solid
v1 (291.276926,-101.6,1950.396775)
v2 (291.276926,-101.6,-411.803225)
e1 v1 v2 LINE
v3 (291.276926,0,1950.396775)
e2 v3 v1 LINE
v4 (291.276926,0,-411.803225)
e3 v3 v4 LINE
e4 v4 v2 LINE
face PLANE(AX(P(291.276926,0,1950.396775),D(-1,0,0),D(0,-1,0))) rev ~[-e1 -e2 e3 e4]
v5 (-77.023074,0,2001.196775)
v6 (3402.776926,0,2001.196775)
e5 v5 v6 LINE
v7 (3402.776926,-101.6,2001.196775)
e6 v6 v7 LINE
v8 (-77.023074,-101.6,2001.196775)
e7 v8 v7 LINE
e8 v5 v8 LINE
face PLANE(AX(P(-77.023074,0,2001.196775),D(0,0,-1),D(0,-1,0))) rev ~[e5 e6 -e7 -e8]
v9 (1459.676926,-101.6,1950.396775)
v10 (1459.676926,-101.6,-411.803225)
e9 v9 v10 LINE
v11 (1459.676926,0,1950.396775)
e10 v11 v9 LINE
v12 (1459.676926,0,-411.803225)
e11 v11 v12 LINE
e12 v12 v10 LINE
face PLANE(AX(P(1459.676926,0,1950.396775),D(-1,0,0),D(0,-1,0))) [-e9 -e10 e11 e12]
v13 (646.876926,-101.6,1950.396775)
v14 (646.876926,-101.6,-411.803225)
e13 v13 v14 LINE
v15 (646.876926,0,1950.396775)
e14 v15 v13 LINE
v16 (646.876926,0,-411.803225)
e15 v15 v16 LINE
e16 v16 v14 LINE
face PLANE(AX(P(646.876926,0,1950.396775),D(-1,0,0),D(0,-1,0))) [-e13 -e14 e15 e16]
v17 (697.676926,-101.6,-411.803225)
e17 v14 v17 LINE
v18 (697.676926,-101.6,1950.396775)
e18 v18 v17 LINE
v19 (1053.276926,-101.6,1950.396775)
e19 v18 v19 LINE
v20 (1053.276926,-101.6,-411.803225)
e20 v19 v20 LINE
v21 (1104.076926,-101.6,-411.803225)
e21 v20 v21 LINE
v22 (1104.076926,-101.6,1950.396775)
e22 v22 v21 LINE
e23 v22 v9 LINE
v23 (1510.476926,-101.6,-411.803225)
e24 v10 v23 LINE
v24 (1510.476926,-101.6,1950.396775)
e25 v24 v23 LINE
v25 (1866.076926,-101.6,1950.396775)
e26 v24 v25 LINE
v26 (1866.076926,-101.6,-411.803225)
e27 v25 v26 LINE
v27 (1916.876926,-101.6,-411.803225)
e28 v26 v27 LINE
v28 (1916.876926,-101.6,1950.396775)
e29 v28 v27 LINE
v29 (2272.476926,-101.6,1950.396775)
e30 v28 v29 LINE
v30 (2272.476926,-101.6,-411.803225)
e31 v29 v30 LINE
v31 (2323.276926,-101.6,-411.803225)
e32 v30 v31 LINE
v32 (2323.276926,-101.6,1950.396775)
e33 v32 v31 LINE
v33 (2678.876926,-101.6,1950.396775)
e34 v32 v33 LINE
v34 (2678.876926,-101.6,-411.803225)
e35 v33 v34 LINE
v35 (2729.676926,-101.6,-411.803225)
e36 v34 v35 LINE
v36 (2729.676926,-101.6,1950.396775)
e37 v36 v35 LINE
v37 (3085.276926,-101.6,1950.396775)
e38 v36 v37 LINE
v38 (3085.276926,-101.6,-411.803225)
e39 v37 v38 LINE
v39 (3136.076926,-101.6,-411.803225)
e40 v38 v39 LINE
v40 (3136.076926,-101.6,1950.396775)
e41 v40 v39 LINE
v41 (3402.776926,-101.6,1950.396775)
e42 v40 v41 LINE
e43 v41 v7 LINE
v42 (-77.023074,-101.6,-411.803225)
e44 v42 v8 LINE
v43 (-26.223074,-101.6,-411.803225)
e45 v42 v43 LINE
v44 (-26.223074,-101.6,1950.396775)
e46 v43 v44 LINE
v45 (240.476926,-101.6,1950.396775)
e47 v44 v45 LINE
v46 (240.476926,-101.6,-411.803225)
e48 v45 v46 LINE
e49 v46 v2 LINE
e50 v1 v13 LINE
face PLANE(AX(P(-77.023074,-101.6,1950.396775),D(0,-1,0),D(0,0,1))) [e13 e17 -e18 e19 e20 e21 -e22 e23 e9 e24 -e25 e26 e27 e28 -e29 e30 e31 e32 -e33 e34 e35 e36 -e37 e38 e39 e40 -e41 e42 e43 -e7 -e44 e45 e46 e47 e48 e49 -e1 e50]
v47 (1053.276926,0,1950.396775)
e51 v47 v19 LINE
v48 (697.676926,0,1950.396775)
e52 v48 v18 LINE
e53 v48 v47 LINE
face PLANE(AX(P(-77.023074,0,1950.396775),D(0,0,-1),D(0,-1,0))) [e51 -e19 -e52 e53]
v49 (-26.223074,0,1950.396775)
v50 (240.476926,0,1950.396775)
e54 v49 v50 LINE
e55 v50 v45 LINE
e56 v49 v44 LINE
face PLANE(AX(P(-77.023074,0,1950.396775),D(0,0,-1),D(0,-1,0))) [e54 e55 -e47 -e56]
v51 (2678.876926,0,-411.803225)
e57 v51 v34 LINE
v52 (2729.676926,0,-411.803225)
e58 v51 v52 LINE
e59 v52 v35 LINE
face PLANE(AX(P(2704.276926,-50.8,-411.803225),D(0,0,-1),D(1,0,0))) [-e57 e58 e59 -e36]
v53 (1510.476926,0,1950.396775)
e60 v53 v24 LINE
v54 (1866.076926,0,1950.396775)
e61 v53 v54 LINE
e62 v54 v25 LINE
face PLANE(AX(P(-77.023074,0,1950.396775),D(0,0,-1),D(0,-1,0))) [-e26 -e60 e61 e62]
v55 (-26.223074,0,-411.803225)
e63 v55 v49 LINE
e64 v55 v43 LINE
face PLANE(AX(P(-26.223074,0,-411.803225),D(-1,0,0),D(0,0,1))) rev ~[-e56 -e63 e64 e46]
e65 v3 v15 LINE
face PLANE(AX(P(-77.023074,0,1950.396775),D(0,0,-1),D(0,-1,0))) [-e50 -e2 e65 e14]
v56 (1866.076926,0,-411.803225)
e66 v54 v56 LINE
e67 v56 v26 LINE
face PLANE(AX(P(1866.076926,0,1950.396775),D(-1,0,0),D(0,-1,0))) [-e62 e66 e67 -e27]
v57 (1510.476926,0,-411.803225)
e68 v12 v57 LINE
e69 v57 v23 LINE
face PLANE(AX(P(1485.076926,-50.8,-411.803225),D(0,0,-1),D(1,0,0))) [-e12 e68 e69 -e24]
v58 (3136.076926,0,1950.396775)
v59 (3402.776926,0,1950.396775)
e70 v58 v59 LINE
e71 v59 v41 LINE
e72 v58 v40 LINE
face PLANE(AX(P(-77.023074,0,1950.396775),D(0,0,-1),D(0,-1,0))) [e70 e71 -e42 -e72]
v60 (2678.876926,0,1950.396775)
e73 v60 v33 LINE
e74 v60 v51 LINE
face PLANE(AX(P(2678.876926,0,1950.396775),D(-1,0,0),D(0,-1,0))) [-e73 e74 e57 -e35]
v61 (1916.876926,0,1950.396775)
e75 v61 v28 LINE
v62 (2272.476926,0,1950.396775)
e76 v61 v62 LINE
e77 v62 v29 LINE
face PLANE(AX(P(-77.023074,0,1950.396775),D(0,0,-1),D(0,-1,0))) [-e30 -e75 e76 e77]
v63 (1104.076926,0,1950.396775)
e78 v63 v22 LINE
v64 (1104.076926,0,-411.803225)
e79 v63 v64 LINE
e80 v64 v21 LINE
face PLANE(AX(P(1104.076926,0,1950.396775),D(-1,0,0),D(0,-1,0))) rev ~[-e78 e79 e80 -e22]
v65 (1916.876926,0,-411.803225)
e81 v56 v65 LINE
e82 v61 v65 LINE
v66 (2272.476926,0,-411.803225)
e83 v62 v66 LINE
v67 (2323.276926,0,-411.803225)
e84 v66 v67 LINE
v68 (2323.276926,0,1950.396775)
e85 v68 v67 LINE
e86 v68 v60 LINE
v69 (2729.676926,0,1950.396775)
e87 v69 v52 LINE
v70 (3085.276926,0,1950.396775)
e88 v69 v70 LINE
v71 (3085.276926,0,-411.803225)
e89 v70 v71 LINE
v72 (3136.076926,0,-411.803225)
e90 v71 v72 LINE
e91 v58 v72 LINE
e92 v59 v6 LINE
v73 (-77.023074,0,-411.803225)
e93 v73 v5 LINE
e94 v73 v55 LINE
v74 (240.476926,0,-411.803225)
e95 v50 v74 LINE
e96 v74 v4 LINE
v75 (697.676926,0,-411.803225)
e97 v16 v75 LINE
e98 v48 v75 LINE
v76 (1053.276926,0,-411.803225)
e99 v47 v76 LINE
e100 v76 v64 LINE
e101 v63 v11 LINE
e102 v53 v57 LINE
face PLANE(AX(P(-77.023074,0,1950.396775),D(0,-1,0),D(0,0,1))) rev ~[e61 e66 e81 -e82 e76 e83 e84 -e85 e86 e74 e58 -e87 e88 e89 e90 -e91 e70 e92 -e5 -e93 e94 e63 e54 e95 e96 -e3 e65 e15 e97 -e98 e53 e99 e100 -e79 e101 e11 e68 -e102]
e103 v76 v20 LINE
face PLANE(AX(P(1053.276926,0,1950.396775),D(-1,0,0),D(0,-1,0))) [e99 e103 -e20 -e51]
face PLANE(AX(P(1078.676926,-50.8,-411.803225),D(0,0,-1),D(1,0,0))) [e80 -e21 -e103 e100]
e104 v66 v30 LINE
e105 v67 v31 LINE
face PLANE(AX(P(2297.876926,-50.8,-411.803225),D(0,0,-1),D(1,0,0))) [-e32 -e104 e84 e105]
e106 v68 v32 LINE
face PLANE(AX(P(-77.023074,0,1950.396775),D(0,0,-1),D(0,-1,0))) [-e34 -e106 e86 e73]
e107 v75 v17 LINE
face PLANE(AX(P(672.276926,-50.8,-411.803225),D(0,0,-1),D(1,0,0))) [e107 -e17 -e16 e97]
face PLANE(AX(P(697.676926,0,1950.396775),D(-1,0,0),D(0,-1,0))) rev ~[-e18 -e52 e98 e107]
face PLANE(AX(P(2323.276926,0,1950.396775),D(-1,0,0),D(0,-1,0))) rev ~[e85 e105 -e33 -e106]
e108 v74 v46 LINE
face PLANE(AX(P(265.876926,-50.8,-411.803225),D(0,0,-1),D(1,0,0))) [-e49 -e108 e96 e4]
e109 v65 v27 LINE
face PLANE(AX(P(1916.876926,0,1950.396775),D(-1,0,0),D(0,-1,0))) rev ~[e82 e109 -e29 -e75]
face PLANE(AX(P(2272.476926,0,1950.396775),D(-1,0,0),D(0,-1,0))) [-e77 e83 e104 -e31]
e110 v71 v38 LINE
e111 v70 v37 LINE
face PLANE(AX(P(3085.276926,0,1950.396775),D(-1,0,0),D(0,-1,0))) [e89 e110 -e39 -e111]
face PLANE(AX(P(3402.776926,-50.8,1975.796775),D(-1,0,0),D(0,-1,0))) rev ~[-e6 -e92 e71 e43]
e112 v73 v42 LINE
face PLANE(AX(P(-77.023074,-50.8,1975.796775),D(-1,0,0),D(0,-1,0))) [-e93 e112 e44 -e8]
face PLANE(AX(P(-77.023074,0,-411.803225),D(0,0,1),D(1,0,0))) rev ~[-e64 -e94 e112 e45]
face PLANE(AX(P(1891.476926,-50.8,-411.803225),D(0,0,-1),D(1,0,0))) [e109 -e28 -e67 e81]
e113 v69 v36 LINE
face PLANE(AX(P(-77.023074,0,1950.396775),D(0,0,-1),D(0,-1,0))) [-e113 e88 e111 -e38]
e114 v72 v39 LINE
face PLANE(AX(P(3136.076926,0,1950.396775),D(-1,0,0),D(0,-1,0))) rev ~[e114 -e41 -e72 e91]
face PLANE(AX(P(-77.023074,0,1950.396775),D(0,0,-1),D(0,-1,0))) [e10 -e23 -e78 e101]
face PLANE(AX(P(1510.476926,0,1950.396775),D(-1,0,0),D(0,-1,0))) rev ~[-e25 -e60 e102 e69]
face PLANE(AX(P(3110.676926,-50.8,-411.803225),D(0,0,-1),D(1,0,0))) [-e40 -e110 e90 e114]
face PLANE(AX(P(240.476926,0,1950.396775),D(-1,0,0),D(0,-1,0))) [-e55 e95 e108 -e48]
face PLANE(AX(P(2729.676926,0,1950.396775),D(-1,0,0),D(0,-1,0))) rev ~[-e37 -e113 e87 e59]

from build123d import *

# Parameters (mm, degrees)
F0_W     = 50.8
F0_H     = 2362.2
F1_DEPTH = 101.6
F2_W     = 101.6
F2_H     = 50.8
F3_DEPTH = 3479.8
F4_W     = 50.8
F4_H     = 101.6
F5_DEPTH = 2362.2


# Not quite as in the source:
# - a feature names something its author has since deleted; it is built from what else it names


with BuildPart() as f1:
    # F0 (on Front) → F1 (new body)
    with BuildSketch(Plane.XZ):
        with Locations((-51.6230743378, 769.2967753548)):
            Rectangle(F0_W, F0_H)
    extrude(amount=F1_DEPTH)

    # F2 (on face) → F3 (join)
    with BuildSketch(Plane(origin=(-77.0230743378, 0, 0), x_dir=(0, -1, 0), z_dir=(-1, 0, 0))):
        with Locations((50.8, 1975.7967753548)):
            Rectangle(F2_W, F2_H)
    extrude(amount=-F3_DEPTH)

    # F4 (on face) → F5 (join)
    with BuildSketch(Plane(origin=(0, 0, 1950.3967753548), x_dir=(1, 0, 0), z_dir=(0, 0, -1))):
        with Locations((265.8769256622, 50.8)):
            Rectangle(F4_W, F4_H)
        with Locations((672.2769256622, 50.8)):
            Rectangle(F4_W, F4_H)
        with Locations((1078.6769256622, 50.8)):
            Rectangle(F4_W, F4_H)
        with Locations((1485.0769256622, 50.8)):
            Rectangle(F4_W, F4_H)
        with Locations((1891.4769256622, 50.8)):
            Rectangle(F4_W, F4_H)
        with Locations((2297.8769256622, 50.8)):
            Rectangle(F4_W, F4_H)
        with Locations((2704.2769256622, 50.8)):
            Rectangle(F4_W, F4_H)
        with Locations((3110.6769256622, 50.8)):
            Rectangle(F4_W, F4_H)
    extrude(amount=F5_DEPTH)


solid = f1.part
